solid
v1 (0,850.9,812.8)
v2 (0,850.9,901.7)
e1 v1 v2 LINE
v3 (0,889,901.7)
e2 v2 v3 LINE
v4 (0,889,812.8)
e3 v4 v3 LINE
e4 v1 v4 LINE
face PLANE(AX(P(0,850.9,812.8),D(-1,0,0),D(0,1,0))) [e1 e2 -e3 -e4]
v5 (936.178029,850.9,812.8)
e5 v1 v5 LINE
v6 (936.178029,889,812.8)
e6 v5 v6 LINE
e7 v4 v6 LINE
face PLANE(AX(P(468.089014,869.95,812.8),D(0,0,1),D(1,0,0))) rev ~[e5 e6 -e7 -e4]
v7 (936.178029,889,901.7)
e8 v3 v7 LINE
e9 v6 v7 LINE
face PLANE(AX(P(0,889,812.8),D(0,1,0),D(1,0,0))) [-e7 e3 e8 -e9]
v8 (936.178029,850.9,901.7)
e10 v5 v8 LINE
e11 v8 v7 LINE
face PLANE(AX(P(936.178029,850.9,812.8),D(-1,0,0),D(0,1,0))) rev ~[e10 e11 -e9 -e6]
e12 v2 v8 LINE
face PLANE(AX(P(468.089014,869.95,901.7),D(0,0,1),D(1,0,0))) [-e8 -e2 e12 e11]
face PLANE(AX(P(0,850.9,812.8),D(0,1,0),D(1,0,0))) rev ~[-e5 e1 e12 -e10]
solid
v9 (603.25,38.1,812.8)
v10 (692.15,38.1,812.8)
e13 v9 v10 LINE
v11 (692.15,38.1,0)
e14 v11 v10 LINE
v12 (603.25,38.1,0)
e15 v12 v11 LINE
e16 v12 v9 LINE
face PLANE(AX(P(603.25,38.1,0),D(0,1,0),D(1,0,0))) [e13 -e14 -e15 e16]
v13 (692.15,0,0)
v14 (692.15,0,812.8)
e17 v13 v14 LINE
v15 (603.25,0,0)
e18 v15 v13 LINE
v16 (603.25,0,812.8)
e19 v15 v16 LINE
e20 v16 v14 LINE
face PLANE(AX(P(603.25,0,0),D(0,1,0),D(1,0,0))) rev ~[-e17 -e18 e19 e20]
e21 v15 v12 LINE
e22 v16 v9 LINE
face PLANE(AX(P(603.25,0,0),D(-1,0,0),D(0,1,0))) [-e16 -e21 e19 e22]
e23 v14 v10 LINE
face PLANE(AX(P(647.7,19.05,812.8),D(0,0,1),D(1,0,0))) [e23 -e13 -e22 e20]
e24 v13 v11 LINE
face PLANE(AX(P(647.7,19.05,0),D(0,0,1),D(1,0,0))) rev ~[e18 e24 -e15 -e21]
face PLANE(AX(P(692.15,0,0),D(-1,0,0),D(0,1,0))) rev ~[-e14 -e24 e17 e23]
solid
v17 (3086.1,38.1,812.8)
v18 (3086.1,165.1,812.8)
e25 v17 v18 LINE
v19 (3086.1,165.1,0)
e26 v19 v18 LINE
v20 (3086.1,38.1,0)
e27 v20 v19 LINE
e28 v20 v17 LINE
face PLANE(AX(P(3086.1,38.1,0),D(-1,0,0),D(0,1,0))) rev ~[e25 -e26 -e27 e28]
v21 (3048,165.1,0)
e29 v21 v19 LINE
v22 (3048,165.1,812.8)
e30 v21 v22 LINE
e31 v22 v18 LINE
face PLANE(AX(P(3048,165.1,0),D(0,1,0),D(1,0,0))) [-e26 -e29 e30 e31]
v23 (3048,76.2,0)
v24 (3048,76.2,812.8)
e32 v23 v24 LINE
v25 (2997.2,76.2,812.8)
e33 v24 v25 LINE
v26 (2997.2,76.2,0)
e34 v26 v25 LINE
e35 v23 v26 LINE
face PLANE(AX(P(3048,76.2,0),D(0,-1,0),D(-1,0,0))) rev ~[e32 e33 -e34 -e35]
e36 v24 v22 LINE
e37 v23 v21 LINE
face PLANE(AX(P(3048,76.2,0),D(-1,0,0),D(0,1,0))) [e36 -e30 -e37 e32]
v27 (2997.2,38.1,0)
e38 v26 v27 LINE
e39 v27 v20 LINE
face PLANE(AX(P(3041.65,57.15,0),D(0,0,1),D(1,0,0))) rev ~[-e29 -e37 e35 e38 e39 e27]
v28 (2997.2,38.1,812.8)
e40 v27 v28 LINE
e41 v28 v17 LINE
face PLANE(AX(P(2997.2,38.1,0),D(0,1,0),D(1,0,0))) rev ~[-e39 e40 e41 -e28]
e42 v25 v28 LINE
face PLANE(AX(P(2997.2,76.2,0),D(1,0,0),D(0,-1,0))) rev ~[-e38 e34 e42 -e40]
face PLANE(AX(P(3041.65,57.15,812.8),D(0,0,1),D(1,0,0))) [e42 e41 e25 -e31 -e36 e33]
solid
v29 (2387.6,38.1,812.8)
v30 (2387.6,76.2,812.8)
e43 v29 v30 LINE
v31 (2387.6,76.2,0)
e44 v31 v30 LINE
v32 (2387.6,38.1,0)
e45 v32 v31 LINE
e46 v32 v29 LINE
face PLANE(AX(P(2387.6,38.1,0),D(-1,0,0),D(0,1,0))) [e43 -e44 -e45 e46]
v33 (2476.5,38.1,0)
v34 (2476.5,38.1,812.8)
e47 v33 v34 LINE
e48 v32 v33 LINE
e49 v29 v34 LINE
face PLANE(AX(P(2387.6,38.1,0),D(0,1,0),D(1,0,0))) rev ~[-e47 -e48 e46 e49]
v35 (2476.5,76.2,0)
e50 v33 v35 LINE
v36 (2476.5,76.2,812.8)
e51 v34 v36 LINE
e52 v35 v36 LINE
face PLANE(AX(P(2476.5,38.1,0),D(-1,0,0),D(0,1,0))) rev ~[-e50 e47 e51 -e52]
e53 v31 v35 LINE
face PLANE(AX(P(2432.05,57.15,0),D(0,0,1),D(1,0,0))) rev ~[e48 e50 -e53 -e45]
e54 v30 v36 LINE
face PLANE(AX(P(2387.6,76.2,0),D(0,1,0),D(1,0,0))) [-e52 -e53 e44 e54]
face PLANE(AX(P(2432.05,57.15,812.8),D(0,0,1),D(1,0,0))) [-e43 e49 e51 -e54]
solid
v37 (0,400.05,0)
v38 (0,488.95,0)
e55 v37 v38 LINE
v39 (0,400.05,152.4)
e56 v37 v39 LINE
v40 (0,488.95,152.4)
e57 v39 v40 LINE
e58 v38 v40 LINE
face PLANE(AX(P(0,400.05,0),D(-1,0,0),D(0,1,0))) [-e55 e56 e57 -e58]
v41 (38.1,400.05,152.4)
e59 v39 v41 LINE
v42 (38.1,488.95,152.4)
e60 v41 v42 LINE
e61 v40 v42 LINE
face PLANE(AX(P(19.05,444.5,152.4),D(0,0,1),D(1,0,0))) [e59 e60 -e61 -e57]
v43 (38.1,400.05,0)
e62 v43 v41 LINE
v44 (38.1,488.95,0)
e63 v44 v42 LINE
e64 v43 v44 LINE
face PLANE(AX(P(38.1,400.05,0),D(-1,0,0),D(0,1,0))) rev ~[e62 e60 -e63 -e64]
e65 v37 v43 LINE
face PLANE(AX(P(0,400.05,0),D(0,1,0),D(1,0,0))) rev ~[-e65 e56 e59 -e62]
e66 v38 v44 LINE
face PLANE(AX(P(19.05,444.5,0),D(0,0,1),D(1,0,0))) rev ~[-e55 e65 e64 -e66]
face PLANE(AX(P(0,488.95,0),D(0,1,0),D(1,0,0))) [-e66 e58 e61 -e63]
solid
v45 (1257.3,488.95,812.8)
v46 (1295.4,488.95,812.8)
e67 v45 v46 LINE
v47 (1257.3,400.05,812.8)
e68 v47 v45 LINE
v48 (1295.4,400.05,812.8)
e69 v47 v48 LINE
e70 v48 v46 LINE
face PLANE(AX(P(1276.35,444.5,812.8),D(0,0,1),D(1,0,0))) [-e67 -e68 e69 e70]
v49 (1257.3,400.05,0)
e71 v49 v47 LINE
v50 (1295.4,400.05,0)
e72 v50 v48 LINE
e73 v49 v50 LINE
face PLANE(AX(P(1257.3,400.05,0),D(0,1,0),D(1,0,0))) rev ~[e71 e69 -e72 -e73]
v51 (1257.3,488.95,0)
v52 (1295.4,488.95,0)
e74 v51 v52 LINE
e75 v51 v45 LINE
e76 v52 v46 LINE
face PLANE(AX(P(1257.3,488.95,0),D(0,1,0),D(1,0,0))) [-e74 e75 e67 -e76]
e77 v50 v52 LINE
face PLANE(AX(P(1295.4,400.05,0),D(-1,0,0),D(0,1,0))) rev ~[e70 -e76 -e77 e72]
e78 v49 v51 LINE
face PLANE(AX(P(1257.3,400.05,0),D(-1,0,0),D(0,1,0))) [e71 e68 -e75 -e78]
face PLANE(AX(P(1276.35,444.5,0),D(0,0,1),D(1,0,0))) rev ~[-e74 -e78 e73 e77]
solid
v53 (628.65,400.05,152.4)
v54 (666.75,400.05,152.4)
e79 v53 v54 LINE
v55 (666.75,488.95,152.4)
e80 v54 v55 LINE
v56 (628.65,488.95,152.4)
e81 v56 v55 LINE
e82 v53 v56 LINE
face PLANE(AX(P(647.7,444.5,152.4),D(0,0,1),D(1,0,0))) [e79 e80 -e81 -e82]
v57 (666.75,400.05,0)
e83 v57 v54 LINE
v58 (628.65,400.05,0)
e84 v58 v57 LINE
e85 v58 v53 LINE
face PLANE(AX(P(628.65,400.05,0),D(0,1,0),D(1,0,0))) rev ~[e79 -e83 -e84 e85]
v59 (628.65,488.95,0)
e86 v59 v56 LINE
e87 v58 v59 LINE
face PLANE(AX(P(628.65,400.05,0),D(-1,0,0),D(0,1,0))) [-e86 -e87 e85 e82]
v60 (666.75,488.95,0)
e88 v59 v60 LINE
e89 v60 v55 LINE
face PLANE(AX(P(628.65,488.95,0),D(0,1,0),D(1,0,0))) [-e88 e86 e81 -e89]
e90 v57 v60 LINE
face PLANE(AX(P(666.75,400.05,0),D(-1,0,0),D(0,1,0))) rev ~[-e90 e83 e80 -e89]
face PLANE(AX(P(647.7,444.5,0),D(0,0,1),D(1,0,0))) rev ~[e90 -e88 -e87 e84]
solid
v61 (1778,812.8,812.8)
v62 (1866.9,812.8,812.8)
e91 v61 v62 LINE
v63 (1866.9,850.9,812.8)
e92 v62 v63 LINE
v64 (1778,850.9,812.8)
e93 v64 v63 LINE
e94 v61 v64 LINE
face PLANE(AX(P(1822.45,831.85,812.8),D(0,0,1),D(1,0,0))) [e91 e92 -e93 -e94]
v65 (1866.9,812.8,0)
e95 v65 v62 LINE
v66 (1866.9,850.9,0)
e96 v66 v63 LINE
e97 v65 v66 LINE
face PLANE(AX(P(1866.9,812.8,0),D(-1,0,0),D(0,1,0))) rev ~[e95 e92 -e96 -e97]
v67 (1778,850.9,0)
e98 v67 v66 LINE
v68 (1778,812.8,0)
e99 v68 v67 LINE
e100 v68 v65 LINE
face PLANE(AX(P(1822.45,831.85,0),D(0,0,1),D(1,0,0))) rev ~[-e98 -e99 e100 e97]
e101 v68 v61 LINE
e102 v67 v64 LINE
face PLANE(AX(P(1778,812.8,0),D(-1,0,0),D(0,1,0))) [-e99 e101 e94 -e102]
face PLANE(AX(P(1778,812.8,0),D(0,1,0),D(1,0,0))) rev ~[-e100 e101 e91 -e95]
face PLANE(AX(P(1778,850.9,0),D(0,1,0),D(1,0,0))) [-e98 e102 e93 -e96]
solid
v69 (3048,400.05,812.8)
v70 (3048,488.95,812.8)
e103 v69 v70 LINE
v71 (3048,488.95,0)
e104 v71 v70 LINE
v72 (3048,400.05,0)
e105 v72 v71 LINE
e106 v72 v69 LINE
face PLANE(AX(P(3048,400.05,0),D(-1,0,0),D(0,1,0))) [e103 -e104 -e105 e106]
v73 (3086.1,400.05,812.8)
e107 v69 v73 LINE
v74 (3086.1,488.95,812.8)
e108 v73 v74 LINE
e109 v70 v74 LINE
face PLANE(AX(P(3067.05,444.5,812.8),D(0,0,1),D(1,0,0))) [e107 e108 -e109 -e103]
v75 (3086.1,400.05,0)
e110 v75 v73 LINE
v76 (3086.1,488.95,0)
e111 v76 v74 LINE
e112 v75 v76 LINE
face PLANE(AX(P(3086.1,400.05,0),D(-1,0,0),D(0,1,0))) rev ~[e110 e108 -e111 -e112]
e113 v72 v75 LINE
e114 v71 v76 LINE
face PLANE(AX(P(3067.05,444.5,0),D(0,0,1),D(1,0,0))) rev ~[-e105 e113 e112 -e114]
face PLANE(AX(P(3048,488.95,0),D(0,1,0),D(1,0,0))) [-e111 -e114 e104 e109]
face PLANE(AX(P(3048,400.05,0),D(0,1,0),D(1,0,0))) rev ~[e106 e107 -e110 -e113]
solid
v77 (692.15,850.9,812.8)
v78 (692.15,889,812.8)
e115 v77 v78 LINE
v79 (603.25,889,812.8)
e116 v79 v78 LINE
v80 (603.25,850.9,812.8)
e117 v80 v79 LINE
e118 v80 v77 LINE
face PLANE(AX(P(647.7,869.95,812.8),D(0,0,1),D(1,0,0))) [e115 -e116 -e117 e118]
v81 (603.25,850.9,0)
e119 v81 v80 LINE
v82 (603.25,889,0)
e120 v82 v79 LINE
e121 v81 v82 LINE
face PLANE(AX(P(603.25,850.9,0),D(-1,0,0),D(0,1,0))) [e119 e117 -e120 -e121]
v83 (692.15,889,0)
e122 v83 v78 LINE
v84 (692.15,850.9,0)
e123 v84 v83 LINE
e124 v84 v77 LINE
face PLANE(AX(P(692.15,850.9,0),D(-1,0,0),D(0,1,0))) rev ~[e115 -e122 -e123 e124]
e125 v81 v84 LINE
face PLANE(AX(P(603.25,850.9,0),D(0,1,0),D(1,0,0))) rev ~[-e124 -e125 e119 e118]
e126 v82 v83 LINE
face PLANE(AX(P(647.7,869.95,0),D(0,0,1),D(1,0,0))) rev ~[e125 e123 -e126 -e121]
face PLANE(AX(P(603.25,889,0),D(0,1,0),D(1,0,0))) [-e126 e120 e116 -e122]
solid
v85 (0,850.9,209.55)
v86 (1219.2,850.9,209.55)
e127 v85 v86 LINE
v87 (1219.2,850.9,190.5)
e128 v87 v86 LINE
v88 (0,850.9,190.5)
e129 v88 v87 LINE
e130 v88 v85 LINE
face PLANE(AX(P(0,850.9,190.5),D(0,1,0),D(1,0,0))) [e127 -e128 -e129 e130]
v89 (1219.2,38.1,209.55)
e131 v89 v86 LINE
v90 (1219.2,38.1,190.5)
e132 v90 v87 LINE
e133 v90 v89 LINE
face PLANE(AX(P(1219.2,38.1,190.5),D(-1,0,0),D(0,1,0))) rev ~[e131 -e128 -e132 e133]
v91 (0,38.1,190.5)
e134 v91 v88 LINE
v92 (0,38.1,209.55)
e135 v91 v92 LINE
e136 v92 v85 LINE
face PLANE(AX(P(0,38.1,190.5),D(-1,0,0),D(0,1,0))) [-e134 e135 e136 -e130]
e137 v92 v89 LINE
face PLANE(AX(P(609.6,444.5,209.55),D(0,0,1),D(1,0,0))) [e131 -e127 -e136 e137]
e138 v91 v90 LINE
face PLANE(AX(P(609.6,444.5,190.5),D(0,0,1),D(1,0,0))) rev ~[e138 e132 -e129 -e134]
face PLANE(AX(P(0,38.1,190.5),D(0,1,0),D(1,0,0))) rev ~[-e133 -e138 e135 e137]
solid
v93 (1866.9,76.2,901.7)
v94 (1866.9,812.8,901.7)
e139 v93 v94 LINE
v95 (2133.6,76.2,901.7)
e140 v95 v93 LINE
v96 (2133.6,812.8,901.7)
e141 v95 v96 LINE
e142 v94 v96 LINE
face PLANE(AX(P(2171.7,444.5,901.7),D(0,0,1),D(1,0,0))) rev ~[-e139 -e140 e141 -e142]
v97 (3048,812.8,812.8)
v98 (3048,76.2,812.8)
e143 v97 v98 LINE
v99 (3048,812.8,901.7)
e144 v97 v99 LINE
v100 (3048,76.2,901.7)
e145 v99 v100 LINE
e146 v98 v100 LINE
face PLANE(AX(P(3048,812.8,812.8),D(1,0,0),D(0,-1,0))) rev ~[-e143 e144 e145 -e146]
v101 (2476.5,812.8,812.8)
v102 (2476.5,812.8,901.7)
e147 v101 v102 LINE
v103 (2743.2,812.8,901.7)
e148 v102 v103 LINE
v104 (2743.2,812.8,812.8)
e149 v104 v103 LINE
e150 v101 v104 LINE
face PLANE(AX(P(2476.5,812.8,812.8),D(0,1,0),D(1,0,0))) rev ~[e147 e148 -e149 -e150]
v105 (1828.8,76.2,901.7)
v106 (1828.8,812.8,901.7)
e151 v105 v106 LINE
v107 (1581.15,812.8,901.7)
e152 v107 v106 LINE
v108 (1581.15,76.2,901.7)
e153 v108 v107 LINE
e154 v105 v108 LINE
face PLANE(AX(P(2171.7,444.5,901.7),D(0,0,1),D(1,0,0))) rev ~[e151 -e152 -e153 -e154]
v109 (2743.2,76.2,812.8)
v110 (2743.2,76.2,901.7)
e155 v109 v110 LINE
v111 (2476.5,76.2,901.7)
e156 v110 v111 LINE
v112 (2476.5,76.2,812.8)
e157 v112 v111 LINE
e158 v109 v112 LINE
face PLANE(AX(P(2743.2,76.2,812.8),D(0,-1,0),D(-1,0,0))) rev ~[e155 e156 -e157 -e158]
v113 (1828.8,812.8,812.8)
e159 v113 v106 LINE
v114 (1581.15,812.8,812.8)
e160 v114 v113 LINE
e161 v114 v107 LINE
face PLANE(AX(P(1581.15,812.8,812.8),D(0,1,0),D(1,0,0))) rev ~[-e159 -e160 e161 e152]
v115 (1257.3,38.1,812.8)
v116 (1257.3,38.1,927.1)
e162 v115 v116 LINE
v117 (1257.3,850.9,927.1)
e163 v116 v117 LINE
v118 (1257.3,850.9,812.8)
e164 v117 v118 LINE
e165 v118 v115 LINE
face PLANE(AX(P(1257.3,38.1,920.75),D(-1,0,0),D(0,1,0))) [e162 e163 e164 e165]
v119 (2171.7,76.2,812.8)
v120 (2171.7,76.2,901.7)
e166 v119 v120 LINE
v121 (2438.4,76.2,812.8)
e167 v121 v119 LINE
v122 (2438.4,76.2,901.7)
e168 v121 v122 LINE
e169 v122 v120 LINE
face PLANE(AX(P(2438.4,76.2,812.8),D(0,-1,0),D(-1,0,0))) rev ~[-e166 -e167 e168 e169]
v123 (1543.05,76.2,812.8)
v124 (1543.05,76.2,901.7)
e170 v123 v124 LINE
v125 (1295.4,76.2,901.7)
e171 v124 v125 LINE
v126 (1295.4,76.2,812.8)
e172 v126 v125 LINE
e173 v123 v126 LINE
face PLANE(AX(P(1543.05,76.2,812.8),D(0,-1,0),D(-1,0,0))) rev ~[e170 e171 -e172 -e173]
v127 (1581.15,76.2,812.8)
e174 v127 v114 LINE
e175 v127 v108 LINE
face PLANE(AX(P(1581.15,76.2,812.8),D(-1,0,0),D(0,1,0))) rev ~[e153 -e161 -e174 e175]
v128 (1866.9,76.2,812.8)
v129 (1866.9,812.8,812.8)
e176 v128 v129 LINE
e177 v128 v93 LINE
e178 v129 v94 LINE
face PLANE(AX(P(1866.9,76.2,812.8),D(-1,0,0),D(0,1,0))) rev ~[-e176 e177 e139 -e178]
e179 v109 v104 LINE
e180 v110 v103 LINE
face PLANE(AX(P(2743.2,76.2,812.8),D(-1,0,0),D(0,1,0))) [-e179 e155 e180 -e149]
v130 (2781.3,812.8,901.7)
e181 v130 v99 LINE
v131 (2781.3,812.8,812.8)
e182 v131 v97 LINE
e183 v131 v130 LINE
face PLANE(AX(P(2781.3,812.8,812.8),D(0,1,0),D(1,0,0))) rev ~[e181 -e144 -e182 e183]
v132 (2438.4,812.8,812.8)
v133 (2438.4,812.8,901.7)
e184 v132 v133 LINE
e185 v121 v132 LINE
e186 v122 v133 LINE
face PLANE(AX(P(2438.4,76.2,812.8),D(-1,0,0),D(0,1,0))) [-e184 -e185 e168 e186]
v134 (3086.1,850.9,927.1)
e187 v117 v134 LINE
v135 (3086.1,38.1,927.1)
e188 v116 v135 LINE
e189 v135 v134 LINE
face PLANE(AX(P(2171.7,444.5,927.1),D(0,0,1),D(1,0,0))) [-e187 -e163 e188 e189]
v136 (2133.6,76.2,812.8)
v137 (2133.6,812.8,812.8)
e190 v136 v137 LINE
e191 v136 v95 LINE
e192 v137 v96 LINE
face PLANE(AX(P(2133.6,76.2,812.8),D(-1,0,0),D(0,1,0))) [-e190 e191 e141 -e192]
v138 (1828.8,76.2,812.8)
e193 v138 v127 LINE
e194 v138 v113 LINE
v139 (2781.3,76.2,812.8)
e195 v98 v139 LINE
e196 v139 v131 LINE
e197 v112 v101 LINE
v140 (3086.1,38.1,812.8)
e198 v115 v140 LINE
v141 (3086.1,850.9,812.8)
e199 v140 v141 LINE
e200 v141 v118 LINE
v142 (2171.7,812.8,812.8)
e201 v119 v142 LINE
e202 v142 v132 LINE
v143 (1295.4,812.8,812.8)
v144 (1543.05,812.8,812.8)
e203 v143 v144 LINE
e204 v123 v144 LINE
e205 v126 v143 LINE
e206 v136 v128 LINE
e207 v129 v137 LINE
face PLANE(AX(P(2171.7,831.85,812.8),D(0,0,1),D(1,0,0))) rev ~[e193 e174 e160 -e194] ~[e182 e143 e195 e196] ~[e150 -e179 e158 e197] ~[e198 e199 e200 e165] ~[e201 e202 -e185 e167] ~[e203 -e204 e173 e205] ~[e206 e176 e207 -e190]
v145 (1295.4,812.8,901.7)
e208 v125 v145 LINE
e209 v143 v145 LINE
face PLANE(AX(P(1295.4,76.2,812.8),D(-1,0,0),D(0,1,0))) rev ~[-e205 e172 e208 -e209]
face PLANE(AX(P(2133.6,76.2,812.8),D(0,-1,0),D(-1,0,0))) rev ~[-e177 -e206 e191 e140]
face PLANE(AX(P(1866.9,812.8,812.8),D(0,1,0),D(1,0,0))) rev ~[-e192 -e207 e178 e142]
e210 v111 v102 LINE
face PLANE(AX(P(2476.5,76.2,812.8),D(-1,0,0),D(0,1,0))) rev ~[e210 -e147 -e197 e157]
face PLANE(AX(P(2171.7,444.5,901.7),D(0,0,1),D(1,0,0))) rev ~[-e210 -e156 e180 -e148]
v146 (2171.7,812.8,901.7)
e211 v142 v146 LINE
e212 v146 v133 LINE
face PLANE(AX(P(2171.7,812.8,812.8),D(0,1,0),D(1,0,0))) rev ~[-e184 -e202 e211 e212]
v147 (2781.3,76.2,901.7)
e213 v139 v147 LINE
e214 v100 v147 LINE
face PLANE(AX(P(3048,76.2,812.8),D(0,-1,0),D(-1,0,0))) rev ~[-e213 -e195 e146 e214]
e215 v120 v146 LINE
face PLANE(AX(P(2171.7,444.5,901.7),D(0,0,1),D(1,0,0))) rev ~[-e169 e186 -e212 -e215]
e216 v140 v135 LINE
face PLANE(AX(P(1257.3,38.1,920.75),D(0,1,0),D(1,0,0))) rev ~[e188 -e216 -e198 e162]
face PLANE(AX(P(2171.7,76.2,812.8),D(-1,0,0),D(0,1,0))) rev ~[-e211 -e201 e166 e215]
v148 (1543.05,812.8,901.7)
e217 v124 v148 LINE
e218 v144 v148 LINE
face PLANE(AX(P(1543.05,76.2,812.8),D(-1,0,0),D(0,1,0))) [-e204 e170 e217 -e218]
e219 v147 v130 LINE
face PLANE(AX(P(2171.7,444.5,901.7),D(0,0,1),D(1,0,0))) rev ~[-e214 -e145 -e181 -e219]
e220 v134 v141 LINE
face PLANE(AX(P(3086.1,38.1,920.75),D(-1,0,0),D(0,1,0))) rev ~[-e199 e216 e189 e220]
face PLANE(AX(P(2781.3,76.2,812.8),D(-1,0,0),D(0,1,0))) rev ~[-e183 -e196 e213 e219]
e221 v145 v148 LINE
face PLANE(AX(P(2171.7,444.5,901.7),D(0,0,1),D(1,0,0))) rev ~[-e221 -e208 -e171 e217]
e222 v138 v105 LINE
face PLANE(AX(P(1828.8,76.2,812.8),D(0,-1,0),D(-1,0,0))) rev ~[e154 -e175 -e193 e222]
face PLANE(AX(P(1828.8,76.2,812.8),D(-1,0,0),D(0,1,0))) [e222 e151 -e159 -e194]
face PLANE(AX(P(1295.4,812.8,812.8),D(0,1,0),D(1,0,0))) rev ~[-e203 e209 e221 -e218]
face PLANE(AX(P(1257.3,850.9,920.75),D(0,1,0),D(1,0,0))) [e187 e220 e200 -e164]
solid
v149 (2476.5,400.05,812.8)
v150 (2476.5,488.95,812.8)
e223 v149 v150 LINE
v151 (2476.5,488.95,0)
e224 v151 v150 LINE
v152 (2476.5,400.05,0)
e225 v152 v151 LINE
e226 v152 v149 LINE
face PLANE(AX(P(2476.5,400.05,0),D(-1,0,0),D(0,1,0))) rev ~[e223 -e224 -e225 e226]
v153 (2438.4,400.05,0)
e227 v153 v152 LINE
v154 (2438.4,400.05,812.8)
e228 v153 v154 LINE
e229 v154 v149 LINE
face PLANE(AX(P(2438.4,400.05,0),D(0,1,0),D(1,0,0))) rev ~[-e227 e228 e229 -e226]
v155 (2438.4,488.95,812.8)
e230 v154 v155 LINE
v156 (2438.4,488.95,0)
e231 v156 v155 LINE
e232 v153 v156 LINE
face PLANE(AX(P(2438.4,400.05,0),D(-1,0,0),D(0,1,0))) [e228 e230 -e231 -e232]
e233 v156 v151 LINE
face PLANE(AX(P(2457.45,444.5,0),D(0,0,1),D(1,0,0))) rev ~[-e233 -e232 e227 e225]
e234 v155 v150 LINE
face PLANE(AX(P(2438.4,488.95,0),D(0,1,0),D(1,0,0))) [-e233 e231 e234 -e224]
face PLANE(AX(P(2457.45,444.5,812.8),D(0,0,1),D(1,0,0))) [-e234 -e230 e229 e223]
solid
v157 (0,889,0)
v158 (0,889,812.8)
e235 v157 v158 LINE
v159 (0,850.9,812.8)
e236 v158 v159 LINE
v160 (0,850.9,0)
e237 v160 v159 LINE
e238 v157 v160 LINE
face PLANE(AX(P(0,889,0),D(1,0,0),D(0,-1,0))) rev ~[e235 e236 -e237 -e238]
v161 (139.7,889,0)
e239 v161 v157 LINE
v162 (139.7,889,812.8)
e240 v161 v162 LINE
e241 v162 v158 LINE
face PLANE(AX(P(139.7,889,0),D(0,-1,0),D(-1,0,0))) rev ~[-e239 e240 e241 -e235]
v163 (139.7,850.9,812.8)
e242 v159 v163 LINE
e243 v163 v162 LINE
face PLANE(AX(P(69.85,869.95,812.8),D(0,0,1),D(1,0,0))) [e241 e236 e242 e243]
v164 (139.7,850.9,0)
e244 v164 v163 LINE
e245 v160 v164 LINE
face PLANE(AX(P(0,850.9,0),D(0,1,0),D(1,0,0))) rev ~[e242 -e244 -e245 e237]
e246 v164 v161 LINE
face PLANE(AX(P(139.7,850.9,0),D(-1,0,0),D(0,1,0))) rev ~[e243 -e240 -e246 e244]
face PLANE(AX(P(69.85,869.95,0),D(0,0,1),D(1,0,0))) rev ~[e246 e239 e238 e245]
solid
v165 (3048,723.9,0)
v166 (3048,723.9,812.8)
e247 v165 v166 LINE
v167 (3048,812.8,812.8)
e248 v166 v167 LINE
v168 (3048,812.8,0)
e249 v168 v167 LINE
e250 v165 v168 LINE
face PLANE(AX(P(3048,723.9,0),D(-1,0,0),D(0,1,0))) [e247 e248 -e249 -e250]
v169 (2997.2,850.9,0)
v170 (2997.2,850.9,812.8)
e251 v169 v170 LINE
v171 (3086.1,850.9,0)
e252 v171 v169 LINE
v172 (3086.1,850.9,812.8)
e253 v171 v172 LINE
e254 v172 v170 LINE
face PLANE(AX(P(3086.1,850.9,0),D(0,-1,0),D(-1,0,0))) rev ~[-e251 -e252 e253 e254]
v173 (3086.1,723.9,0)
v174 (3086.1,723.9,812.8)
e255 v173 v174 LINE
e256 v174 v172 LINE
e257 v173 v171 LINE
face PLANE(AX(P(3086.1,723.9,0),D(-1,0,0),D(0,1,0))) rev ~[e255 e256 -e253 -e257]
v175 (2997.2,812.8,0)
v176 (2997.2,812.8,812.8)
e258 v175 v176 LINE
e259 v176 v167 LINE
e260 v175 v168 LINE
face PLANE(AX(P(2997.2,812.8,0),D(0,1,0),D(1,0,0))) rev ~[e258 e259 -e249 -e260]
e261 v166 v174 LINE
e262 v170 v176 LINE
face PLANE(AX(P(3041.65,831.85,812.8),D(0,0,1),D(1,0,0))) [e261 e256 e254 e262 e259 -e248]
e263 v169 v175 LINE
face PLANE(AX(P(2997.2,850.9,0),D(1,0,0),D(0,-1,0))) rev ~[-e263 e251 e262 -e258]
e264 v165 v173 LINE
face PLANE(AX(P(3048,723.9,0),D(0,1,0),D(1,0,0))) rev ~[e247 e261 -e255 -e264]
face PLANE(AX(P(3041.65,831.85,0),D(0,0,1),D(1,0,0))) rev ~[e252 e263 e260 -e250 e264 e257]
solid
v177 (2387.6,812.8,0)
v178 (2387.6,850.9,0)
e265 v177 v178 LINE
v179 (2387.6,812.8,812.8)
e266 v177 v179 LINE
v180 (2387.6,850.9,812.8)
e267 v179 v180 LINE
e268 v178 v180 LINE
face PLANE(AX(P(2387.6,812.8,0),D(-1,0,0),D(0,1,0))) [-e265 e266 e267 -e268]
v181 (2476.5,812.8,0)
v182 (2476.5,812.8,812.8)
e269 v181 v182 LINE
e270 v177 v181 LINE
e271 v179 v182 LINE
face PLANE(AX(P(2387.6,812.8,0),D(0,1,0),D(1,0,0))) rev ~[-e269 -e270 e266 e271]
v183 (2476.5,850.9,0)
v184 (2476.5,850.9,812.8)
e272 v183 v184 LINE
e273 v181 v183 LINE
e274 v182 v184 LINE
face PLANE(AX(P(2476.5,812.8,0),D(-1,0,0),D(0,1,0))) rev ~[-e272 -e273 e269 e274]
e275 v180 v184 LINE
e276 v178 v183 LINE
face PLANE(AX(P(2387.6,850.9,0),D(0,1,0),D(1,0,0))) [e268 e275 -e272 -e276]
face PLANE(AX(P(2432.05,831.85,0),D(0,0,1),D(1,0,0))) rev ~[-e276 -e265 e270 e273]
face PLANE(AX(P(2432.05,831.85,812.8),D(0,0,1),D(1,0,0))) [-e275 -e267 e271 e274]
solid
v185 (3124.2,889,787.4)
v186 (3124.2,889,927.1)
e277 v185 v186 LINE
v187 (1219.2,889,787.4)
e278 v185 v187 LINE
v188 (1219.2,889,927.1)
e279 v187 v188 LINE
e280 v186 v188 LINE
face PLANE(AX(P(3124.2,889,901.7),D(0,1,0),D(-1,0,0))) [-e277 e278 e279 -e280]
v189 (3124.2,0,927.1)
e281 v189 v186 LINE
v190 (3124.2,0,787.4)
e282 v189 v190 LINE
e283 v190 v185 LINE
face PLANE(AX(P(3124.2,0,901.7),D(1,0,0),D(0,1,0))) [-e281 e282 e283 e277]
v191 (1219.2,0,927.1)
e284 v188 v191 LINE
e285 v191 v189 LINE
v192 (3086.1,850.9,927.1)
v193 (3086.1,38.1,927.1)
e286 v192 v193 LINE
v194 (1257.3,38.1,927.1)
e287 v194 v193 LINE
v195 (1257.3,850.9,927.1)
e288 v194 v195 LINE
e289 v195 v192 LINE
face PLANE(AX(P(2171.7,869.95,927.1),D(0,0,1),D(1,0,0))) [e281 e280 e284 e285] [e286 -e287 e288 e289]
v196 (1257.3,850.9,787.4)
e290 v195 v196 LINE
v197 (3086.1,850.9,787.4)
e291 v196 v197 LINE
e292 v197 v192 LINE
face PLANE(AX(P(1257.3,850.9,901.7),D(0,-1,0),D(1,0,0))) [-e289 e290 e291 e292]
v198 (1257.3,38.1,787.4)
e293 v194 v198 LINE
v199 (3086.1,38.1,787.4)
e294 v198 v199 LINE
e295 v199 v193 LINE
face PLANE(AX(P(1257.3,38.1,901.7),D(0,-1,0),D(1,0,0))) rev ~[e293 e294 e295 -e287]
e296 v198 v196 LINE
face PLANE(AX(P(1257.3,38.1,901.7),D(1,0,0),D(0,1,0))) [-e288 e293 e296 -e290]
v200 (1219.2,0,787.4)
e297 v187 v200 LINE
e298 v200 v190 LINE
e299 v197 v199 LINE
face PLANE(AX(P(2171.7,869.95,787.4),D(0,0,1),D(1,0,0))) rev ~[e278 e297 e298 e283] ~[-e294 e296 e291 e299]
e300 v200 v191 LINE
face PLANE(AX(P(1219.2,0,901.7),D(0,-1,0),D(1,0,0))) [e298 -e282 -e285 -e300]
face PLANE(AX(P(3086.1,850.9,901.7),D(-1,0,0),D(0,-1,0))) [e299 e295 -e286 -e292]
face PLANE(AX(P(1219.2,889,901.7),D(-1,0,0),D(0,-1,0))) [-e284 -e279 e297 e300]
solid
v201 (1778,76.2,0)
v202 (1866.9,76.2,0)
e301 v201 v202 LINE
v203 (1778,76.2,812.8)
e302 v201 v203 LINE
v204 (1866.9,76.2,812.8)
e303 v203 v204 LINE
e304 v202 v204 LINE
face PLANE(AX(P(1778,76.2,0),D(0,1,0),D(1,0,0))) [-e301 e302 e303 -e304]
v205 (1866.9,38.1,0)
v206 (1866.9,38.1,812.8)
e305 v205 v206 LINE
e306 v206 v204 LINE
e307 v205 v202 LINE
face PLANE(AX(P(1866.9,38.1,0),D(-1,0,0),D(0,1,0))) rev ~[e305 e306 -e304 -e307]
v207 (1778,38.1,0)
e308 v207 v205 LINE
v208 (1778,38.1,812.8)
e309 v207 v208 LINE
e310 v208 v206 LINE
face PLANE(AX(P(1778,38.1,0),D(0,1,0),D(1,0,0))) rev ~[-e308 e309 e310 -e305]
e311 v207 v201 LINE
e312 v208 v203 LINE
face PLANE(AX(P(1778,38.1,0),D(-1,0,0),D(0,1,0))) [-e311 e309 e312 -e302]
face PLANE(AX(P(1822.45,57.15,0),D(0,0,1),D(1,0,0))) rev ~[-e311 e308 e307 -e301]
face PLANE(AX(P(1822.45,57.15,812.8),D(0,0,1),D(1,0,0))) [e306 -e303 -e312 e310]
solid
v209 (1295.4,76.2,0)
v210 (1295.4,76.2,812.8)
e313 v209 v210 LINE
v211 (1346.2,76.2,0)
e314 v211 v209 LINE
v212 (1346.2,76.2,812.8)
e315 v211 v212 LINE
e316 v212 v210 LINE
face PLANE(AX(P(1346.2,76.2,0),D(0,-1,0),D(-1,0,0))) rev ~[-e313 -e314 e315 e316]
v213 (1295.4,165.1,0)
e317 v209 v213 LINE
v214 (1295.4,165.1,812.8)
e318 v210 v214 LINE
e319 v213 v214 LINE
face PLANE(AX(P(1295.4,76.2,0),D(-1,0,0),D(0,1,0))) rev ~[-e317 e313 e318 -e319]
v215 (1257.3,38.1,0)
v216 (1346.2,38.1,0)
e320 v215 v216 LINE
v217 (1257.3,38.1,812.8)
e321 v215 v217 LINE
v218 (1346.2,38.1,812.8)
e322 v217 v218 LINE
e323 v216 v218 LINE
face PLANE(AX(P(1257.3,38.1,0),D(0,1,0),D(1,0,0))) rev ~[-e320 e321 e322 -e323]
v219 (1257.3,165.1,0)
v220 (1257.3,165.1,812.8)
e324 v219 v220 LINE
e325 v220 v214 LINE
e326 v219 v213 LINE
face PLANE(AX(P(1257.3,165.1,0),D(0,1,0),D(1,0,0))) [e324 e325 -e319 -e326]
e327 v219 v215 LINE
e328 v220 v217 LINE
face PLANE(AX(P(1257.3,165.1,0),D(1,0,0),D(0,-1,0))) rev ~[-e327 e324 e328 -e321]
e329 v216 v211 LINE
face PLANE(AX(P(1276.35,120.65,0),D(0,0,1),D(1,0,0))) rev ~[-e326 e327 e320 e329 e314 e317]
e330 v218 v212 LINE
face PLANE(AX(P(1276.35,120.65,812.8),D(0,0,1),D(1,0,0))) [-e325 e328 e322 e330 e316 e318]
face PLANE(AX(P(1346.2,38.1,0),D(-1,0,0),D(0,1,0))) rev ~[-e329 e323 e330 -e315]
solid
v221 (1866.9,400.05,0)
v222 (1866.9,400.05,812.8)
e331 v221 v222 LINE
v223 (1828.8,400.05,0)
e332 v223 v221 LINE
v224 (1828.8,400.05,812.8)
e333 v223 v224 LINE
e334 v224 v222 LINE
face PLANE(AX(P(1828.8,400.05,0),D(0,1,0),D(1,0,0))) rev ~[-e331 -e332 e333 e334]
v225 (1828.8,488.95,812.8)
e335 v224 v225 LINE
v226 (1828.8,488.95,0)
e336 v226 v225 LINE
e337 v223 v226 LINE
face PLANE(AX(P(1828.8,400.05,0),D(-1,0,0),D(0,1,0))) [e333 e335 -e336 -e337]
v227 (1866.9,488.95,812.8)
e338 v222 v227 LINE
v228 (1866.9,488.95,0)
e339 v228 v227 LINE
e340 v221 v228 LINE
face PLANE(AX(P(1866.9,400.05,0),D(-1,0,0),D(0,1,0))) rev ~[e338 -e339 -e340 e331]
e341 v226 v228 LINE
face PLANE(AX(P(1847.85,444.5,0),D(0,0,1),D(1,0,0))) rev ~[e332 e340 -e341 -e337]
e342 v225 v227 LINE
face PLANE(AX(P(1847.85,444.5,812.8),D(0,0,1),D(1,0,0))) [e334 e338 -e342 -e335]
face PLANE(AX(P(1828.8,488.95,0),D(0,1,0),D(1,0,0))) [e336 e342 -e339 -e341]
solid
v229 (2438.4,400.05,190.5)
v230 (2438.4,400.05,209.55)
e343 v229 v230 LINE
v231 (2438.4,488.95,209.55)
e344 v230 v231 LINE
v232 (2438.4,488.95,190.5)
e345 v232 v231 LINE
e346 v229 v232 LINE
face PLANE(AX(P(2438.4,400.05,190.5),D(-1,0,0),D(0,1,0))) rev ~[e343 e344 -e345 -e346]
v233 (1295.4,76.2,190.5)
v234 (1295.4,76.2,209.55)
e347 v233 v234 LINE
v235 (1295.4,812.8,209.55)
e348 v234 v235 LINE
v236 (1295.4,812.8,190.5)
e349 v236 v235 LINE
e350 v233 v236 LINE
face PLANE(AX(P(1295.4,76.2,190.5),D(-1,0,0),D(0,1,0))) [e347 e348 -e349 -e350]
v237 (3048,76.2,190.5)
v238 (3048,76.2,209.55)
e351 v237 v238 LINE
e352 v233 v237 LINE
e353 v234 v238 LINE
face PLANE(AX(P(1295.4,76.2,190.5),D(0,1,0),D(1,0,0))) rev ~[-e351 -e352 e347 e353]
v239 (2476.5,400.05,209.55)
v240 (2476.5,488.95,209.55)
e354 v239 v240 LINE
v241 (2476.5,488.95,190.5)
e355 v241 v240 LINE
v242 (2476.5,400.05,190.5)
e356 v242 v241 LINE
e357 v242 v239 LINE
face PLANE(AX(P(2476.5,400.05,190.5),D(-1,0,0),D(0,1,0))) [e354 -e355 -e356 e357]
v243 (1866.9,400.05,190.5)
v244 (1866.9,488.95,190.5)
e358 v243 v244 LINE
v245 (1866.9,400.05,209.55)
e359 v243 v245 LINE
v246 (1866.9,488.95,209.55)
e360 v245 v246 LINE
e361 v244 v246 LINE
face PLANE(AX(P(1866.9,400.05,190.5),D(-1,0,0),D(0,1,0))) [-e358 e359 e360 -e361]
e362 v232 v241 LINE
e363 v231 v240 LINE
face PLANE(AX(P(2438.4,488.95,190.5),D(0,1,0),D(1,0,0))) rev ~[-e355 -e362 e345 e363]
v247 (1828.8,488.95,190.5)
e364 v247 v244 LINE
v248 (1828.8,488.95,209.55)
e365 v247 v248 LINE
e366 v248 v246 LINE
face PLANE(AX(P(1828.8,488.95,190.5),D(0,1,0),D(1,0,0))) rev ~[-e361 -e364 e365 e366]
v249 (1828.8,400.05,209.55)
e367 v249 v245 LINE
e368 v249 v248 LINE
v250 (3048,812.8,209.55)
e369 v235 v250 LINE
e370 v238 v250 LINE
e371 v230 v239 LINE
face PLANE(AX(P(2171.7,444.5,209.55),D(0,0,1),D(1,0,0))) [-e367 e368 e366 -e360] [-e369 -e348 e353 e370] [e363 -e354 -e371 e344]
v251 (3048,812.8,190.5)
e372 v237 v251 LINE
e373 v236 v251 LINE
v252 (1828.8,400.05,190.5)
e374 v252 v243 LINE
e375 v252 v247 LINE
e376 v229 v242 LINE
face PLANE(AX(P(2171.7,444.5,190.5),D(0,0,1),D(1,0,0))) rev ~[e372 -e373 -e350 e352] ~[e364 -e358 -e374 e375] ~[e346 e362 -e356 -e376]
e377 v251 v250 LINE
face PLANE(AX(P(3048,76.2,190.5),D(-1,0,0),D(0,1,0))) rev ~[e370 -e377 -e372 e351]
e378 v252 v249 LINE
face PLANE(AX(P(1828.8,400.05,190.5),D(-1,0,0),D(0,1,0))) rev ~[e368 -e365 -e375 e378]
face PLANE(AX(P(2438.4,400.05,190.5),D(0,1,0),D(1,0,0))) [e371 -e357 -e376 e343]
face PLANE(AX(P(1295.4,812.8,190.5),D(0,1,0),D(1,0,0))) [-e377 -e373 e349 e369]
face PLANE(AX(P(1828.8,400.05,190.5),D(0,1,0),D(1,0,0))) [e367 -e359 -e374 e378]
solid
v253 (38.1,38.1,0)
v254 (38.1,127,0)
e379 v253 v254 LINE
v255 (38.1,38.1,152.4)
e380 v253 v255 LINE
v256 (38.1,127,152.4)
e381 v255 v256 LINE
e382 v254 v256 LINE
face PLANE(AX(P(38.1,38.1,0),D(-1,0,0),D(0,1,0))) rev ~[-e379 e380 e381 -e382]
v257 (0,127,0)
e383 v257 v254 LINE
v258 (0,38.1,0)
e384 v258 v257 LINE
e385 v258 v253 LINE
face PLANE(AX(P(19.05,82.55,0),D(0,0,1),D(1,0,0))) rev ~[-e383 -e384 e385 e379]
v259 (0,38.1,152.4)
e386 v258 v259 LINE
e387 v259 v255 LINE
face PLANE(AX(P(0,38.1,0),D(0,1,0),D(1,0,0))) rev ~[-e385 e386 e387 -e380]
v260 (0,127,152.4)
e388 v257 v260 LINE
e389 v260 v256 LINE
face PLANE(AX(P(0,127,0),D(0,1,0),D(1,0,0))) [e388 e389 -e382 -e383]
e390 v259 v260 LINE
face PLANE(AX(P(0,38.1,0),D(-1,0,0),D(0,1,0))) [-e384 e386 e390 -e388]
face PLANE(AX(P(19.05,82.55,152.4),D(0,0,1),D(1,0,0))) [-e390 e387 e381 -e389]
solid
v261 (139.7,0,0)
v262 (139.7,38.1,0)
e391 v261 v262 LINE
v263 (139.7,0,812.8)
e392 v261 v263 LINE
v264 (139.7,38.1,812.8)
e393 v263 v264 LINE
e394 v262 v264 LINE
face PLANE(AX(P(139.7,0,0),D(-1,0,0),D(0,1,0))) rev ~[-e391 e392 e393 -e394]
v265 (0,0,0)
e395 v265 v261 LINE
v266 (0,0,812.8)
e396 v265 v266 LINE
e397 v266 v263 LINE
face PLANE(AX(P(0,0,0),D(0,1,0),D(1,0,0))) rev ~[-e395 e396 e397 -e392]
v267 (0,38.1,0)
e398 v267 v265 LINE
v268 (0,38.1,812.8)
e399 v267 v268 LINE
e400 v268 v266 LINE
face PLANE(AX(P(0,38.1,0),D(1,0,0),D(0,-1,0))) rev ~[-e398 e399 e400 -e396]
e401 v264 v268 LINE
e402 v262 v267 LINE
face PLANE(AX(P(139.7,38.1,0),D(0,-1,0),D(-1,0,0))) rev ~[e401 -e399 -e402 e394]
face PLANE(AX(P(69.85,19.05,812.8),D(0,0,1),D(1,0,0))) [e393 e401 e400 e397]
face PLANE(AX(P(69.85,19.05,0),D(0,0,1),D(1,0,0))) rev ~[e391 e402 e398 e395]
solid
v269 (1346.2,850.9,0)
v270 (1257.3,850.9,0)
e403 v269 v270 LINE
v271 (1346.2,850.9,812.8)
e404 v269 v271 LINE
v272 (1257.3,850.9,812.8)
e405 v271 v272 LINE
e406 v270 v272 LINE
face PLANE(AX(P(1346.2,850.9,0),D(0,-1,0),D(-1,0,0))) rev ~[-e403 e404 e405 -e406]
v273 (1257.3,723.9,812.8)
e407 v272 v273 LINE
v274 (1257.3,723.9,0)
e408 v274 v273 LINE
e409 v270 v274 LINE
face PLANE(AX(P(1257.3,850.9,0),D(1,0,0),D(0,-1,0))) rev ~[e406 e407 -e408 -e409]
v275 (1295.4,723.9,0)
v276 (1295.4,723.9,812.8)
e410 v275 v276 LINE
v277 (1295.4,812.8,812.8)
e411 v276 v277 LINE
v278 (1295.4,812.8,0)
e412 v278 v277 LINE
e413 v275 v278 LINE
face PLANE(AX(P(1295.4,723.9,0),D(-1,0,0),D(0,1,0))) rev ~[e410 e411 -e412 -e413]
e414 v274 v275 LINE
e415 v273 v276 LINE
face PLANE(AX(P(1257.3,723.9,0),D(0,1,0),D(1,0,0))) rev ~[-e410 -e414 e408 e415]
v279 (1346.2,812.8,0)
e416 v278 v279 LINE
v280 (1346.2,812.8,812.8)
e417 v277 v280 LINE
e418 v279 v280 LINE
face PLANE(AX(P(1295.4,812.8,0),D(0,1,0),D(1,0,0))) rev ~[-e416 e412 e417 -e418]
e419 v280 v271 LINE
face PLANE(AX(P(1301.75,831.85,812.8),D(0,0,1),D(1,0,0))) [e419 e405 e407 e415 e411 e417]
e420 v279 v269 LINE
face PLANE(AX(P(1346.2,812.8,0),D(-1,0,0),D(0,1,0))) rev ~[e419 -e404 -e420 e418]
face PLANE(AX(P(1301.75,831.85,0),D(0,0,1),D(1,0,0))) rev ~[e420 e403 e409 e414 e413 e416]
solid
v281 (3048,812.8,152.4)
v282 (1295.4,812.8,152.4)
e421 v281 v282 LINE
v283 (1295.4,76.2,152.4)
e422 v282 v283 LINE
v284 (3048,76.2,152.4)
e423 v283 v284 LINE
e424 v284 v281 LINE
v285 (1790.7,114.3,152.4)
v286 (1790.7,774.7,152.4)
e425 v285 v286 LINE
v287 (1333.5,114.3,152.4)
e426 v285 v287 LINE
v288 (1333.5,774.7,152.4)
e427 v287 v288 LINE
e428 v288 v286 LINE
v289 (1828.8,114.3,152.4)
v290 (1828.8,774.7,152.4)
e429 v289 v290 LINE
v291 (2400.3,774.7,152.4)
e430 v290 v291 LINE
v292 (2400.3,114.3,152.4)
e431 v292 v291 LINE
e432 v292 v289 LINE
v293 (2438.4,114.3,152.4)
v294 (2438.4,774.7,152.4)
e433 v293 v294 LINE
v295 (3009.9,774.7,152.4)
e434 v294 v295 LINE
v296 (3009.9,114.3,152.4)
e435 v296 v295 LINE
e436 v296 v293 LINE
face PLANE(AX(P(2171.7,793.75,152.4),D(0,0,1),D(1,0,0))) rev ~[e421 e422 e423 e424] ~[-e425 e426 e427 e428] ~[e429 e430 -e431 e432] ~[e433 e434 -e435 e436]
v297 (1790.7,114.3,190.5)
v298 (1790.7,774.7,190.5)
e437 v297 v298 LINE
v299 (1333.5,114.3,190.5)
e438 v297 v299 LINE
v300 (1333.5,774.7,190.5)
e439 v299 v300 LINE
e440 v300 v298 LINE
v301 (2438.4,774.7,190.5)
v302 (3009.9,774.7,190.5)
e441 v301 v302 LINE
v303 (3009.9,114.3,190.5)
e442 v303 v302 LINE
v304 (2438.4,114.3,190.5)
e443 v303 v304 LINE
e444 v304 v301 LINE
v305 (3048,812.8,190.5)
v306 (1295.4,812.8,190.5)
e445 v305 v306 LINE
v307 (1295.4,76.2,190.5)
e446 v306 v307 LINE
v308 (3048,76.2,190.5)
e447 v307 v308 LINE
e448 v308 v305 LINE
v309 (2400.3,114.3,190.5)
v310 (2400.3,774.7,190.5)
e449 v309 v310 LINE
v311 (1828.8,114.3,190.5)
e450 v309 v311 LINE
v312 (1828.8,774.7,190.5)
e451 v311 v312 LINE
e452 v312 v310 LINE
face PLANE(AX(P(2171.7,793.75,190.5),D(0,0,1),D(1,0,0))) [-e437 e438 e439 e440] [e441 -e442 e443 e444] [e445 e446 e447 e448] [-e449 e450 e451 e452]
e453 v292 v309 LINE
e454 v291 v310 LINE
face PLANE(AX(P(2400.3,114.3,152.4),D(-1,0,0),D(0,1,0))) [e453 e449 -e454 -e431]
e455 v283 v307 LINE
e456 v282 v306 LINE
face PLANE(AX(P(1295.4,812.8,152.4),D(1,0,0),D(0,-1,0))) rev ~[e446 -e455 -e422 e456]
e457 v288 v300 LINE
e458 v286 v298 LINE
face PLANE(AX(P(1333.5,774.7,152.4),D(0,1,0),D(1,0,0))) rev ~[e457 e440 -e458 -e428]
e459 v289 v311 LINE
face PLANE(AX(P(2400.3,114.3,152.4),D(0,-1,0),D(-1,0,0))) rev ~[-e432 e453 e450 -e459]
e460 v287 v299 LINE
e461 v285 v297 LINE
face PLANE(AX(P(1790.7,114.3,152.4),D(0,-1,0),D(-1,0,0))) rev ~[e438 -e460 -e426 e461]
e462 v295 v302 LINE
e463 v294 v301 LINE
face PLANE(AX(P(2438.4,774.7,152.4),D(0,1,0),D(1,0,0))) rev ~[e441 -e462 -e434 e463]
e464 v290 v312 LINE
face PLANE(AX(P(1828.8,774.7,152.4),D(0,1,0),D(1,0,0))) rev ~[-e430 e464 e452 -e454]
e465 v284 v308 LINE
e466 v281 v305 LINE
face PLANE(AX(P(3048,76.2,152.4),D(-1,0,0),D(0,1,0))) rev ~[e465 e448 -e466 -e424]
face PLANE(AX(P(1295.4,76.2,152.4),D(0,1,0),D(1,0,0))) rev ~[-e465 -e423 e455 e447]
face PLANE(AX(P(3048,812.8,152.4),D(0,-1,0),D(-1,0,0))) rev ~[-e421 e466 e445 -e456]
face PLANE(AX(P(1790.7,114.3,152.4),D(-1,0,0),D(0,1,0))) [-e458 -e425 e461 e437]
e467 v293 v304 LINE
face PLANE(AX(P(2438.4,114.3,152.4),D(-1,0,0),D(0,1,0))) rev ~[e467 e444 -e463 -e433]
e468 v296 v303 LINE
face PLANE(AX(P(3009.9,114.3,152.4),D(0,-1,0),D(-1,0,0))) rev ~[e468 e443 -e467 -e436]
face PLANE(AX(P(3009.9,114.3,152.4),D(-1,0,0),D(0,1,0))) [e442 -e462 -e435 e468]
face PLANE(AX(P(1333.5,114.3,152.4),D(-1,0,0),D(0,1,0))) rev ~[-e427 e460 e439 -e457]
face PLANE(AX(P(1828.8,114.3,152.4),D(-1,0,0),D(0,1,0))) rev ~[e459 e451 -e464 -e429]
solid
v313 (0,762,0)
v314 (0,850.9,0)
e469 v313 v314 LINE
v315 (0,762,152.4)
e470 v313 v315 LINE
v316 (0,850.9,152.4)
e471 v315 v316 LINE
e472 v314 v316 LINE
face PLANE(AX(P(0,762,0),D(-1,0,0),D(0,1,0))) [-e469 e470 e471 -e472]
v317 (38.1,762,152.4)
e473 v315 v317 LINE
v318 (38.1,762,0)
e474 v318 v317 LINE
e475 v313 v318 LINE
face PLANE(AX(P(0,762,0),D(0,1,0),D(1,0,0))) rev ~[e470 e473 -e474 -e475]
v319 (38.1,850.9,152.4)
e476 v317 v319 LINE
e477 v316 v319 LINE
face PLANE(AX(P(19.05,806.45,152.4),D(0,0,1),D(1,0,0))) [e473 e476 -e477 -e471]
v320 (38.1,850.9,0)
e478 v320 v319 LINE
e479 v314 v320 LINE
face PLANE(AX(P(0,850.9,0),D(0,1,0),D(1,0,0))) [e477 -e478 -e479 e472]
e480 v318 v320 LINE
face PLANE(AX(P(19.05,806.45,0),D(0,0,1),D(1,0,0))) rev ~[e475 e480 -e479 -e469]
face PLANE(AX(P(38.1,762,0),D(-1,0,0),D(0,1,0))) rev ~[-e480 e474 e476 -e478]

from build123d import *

# Parameters (mm, degrees)
F2_W           = 88.9
F2_H           = 38.1
F3_DEPTH       = 812.8
F2_W_2         = 38.1
F2_H_2         = 88.9
F4_DEPTH       = 152.4
F5_W           = 38.1
F5_H           = 660.4
F6_DEPTH       = 38.1
F7_W           = 1752.6
F7_H           = 736.6
F7_W_2         = 38.1
F7_H_2         = 88.9
F8_DEPTH       = 19.05
F7_W_3         = 1219.2
F7_H_3         = 812.8
F9_W           = 38.1
F9_H           = 736.6
F10_DEPTH      = 88.9
F9_W_2         = 936.1780285835
F9_H_2         = 38.1
F11_W          = 1828.8
F11_H          = 38.1
F12_DEPTH      = 25.4
F12_DEPTH_BACK = 114.3
F13_W          = 1828.8
F13_H          = 812.8
F14_DEPTH      = 19.05
F15_W          = 1828.8
F15_H          = 812.8
F16_DEPTH      = 6.35


# Not quite as in the source:
# - a feature names something its author has since deleted; it is built from what else it names


with BuildPart() as f3:
    # F2 (on Top) → F3 (new body)
    with BuildSketch(Plane.XY):
        with Locations((2432.05, 831.85)):
            Rectangle(F2_W, F2_H)
    extrude(amount=F3_DEPTH)


with BuildPart() as f3b:
    # F2 (on Top) → F3, piece 2 (new body)
    with BuildSketch(Plane.XY):
        with Locations((1822.45, 831.85)):
            Rectangle(F2_W, F2_H)
    extrude(amount=F3_DEPTH)


with BuildPart() as f3c:
    # F2 (on Top) → F3, piece 3 (new body)
    with BuildSketch(Plane.XY):
        with Locations((647.7, 869.95)):
            Rectangle(F2_W, F2_H)
    extrude(amount=F3_DEPTH)


with BuildPart() as f3d:
    # F2 (on Top) → F3, piece 4 (new body)
    with BuildSketch(Plane.XY):
        with Locations((1822.45, 57.15)):
            Rectangle(F2_W, F2_H)
    extrude(amount=F3_DEPTH)


with BuildPart() as f3e:
    # F2 (on Top) → F3, piece 5 (new body)
    with BuildSketch(Plane.XY):
        with Locations((647.7, 19.05)):
            Rectangle(F2_W, F2_H)
    extrude(amount=F3_DEPTH)


with BuildPart() as f3f:
    # F2 (on Top) → F3, piece 6 (new body)
    with BuildSketch(Plane.XY):
        with Locations((2432.05, 57.15)):
            Rectangle(F2_W, F2_H)
    extrude(amount=F3_DEPTH)


with BuildPart() as f3g:
    # F2 (on Top) → F3, piece 7 (new body)
    with BuildSketch(Plane.XY):
        with Locations((2457.45, 444.5)):
            Rectangle(F2_W_2, F2_H_2)
    extrude(amount=F3_DEPTH)


with BuildPart() as f3h:
    # F2 (on Top) → F3, piece 8 (new body)
    with BuildSketch(Plane.XY):
        with Locations((3067.05, 444.5)):
            Rectangle(F2_W_2, F2_H_2)
    extrude(amount=F3_DEPTH)


with BuildPart() as f3i:
    # F2 (on Top) → F3, piece 9 (new body)
    with BuildSketch(Plane.XY):
        with Locations((1847.85, 444.5)):
            Rectangle(F2_W_2, F2_H_2)
    extrude(amount=F3_DEPTH)


with BuildPart() as f3j:
    # F2 (on Top) → F3, piece 10 (new body)
    with BuildSketch(Plane.XY):
        with Locations((1276.35, 444.5)):
            Rectangle(F2_W_2, F2_H_2)
    extrude(amount=F3_DEPTH)


with BuildPart() as f3k:
    # F2 (on Top) → F3, piece 11 (new body)
    with BuildSketch(Plane.XY):
        Polygon((3048, 812.8), (3086.1, 812.8), (3086.1, 850.9), (2997.2, 850.9), (2997.2, 812.8), align=None)
        with Locations((3067.05, 768.35)):
            Rectangle(F2_W_2, F2_H_2)
    extrude(amount=F3_DEPTH)


with BuildPart() as f3l:
    # F2 (on Top) → F3, piece 12 (new body)
    with BuildSketch(Plane.XY):
        Polygon((1346.2, 812.8), (1346.2, 850.9), (1257.3, 850.9), (1257.3, 812.8), (1295.4, 812.8), align=None)
        with Locations((1276.35, 768.35)):
            Rectangle(F2_W_2, F2_H_2)
    extrude(amount=F3_DEPTH)


with BuildPart() as f3m:
    # F2 (on Top) → F3, piece 13 (new body)
    with BuildSketch(Plane.XY):
        Polygon((139.7, 889), (0, 889), (0, 850.9), (38.1, 850.9), (139.7, 850.9), align=None)
    extrude(amount=F3_DEPTH)


with BuildPart() as f3n:
    # F2 (on Top) → F3, piece 14 (new body)
    with BuildSketch(Plane.XY):
        Polygon((38.1, 38.1), (0, 38.1), (0, 0), (139.7, 0), (139.7, 38.1), align=None)
    extrude(amount=F3_DEPTH)


with BuildPart() as f3o:
    # F2 (on Top) → F3, piece 15 (new body)
    with BuildSketch(Plane.XY):
        Polygon((3086.1, 38.1), (3086.1, 76.2), (3048, 76.2), (2997.2, 76.2), (2997.2, 38.1), align=None)
        with Locations((3067.05, 120.65)):
            Rectangle(F2_W_2, F2_H_2)
    extrude(amount=F3_DEPTH)


with BuildPart() as f3p:
    # F2 (on Top) → F3, piece 16 (new body)
    with BuildSketch(Plane.XY):
        with Locations((1276.35, 120.65)):
            Rectangle(F2_W_2, F2_H_2)
        Polygon((1295.4, 76.2), (1257.3, 76.2), (1257.3, 38.1), (1346.2, 38.1), (1346.2, 76.2), align=None)
    extrude(amount=F3_DEPTH)


with BuildPart() as f4:
    # F2 (on Top) → F4 (new body)
    with BuildSketch(Plane.XY):
        with Locations((19.05, 444.5)):
            Rectangle(F2_W_2, F2_H_2)
    extrude(amount=F4_DEPTH)


with BuildPart() as f4b:
    # F2 (on Top) → F4, piece 2 (new body)
    with BuildSketch(Plane.XY):
        with Locations((647.7, 444.5)):
            Rectangle(F2_W_2, F2_H_2)
    extrude(amount=F4_DEPTH)


with BuildPart() as f4c:
    # F2 (on Top) → F4, piece 3 (new body)
    with BuildSketch(Plane.XY):
        with Locations((19.05, 806.45)):
            Rectangle(F2_W_2, F2_H_2)
    extrude(amount=F4_DEPTH)


with BuildPart() as f4d:
    # F2 (on Top) → F4, piece 4 (new body)
    with BuildSketch(Plane.XY):
        with Locations((19.05, 82.55)):
            Rectangle(F2_W_2, F2_H_2)
    extrude(amount=F4_DEPTH)


with BuildPart() as f6:
    # F5 (on offset) → F6 (new body)
    with BuildSketch(Plane.XY.offset(152.4)):
        Polygon((3048, 812.8), (1295.4, 812.8), (1295.4, 774.7), (1333.5, 774.7), (1790.7, 774.7), (1828.8, 774.7), (2400.3, 774.7), (2438.4, 774.7), (3009.9, 774.7), (3048, 774.7), align=None)
        with Locations((1314.45, 444.5)):
            Rectangle(F5_W, F5_H)
        with Locations((3028.95, 444.5)):
            Rectangle(F5_W, F5_H)
        Polygon((1333.5, 114.3), (1295.4, 114.3), (1295.4, 76.2), (3048, 76.2), (3048, 114.3), (3009.9, 114.3), (2438.4, 114.3), (2400.3, 114.3), (1828.8, 114.3), (1790.7, 114.3), align=None)
        with Locations((1809.75, 444.5)):
            Rectangle(F5_W, F5_H)
        with Locations((2419.35, 444.5)):
            Rectangle(F5_W, F5_H)
    extrude(amount=F6_DEPTH)


with BuildPart() as f8:
    # F7 (on face) → F8 (new body)
    with BuildSketch(Plane.XY.offset(190.5)):
        with Locations((2171.7, 444.5)):
            Rectangle(F7_W, F7_H)
        with Locations((1847.85, 444.5)):
            Rectangle(F7_W_2, F7_H_2, mode=Mode.SUBTRACT)
        with Locations((2457.45, 444.5)):
            Rectangle(F7_W_2, F7_H_2, mode=Mode.SUBTRACT)
    extrude(amount=F8_DEPTH)


with BuildPart() as f8b:
    # F7 (on face) → F8, piece 2 (new body)
    with BuildSketch(Plane.XY.offset(190.5)):
        with Locations((609.6, 444.5)):
            Rectangle(F7_W_3, F7_H_3)
    extrude(amount=F8_DEPTH)


with BuildPart() as f10:
    # F9 (on face) → F10 (new body)
    with BuildSketch(Plane.XY.offset(812.8)):
        Polygon((3048, 850.9), (1295.4, 850.9), (1295.4, 812.8), (1543.05, 812.8), (1581.15, 812.8), (1828.8, 812.8), (1866.9, 812.8), (2133.6, 812.8), (2171.7, 812.8), (2438.4, 812.8), (2476.5, 812.8), (2743.2, 812.8), (2781.3, 812.8), (3048, 812.8), align=None)
        Polygon((1295.4, 812.8), (1295.4, 850.9), (1257.3, 850.9), (1257.3, 38.1), (1295.4, 38.1), (1295.4, 76.2), align=None)
        Polygon((3086.1, 850.9), (3048, 850.9), (3048, 812.8), (3048, 76.2), (3048, 38.1), (3086.1, 38.1), align=None)
        Polygon((1543.05, 76.2), (1295.4, 76.2), (1295.4, 38.1), (3048, 38.1), (3048, 76.2), (2781.3, 76.2), (2743.2, 76.2), (2476.5, 76.2), (2438.4, 76.2), (2171.7, 76.2), (2133.6, 76.2), (1866.9, 76.2), (1828.8, 76.2), (1581.15, 76.2), align=None)
        with Locations((1562.1, 444.5)):
            Rectangle(F9_W, F9_H)
        with Locations((1847.85, 444.5)):
            Rectangle(F9_W, F9_H)
        with Locations((2152.65, 444.5)):
            Rectangle(F9_W, F9_H)
        with Locations((2457.45, 444.5)):
            Rectangle(F9_W, F9_H)
        with Locations((2762.25, 444.5)):
            Rectangle(F9_W, F9_H)
    extrude(amount=F10_DEPTH)

    # F13 (on face) → F14 (join)
    with BuildSketch(Plane.XY.offset(901.7)):
        with Locations((2171.7, 444.5)):
            Rectangle(F13_W, F13_H)
    extrude(amount=F14_DEPTH)

    # F15 (on face) → F16 (join)
    with BuildSketch(Plane.XY.offset(920.75)):
        with Locations((2171.7, 444.5)):
            Rectangle(F15_W, F15_H)
    extrude(amount=F16_DEPTH)


with BuildPart() as f10b:
    # F9 (on face) → F10, piece 2 (new body)
    with BuildSketch(Plane.XY.offset(812.8)):
        with Locations((468.0890142918, 869.95)):
            Rectangle(F9_W_2, F9_H_2)
    extrude(amount=F10_DEPTH)


with BuildPart() as f12:
    # F11 (on face) → F12 (new body, two sides)
    with BuildSketch(Plane.XY.offset(901.7)) as f12_sk:
        with Locations((2171.7, 869.95)):
            Rectangle(F11_W, F11_H)
        Polygon((3124.2, 889), (3086.1, 889), (3086.1, 850.9), (3086.1, 38.1), (3086.1, 0), (3124.2, 0), align=None)
        Polygon((1257.3, 850.9), (1257.3, 889), (1219.2, 889), (1219.2, 0), (1257.3, 0), (1257.3, 38.1), align=None)
        with Locations((2171.7, 19.05)):
            Rectangle(F11_W, F11_H)
    extrude(amount=F12_DEPTH)
    extrude(f12_sk.sketch, amount=-F12_DEPTH_BACK)


solid = Compound([f3.part, f3b.part, f3c.part, f3d.part, f3e.part, f3f.part, f3g.part, f3h.part, f3i.part, f3j.part, f3k.part, f3l.part, f3m.part, f3n.part, f3o.part, f3p.part, f4.part, f4b.part, f4c.part, f4d.part, f6.part, f8.part, f8b.part, f10.part, f10b.part, f12.part])
